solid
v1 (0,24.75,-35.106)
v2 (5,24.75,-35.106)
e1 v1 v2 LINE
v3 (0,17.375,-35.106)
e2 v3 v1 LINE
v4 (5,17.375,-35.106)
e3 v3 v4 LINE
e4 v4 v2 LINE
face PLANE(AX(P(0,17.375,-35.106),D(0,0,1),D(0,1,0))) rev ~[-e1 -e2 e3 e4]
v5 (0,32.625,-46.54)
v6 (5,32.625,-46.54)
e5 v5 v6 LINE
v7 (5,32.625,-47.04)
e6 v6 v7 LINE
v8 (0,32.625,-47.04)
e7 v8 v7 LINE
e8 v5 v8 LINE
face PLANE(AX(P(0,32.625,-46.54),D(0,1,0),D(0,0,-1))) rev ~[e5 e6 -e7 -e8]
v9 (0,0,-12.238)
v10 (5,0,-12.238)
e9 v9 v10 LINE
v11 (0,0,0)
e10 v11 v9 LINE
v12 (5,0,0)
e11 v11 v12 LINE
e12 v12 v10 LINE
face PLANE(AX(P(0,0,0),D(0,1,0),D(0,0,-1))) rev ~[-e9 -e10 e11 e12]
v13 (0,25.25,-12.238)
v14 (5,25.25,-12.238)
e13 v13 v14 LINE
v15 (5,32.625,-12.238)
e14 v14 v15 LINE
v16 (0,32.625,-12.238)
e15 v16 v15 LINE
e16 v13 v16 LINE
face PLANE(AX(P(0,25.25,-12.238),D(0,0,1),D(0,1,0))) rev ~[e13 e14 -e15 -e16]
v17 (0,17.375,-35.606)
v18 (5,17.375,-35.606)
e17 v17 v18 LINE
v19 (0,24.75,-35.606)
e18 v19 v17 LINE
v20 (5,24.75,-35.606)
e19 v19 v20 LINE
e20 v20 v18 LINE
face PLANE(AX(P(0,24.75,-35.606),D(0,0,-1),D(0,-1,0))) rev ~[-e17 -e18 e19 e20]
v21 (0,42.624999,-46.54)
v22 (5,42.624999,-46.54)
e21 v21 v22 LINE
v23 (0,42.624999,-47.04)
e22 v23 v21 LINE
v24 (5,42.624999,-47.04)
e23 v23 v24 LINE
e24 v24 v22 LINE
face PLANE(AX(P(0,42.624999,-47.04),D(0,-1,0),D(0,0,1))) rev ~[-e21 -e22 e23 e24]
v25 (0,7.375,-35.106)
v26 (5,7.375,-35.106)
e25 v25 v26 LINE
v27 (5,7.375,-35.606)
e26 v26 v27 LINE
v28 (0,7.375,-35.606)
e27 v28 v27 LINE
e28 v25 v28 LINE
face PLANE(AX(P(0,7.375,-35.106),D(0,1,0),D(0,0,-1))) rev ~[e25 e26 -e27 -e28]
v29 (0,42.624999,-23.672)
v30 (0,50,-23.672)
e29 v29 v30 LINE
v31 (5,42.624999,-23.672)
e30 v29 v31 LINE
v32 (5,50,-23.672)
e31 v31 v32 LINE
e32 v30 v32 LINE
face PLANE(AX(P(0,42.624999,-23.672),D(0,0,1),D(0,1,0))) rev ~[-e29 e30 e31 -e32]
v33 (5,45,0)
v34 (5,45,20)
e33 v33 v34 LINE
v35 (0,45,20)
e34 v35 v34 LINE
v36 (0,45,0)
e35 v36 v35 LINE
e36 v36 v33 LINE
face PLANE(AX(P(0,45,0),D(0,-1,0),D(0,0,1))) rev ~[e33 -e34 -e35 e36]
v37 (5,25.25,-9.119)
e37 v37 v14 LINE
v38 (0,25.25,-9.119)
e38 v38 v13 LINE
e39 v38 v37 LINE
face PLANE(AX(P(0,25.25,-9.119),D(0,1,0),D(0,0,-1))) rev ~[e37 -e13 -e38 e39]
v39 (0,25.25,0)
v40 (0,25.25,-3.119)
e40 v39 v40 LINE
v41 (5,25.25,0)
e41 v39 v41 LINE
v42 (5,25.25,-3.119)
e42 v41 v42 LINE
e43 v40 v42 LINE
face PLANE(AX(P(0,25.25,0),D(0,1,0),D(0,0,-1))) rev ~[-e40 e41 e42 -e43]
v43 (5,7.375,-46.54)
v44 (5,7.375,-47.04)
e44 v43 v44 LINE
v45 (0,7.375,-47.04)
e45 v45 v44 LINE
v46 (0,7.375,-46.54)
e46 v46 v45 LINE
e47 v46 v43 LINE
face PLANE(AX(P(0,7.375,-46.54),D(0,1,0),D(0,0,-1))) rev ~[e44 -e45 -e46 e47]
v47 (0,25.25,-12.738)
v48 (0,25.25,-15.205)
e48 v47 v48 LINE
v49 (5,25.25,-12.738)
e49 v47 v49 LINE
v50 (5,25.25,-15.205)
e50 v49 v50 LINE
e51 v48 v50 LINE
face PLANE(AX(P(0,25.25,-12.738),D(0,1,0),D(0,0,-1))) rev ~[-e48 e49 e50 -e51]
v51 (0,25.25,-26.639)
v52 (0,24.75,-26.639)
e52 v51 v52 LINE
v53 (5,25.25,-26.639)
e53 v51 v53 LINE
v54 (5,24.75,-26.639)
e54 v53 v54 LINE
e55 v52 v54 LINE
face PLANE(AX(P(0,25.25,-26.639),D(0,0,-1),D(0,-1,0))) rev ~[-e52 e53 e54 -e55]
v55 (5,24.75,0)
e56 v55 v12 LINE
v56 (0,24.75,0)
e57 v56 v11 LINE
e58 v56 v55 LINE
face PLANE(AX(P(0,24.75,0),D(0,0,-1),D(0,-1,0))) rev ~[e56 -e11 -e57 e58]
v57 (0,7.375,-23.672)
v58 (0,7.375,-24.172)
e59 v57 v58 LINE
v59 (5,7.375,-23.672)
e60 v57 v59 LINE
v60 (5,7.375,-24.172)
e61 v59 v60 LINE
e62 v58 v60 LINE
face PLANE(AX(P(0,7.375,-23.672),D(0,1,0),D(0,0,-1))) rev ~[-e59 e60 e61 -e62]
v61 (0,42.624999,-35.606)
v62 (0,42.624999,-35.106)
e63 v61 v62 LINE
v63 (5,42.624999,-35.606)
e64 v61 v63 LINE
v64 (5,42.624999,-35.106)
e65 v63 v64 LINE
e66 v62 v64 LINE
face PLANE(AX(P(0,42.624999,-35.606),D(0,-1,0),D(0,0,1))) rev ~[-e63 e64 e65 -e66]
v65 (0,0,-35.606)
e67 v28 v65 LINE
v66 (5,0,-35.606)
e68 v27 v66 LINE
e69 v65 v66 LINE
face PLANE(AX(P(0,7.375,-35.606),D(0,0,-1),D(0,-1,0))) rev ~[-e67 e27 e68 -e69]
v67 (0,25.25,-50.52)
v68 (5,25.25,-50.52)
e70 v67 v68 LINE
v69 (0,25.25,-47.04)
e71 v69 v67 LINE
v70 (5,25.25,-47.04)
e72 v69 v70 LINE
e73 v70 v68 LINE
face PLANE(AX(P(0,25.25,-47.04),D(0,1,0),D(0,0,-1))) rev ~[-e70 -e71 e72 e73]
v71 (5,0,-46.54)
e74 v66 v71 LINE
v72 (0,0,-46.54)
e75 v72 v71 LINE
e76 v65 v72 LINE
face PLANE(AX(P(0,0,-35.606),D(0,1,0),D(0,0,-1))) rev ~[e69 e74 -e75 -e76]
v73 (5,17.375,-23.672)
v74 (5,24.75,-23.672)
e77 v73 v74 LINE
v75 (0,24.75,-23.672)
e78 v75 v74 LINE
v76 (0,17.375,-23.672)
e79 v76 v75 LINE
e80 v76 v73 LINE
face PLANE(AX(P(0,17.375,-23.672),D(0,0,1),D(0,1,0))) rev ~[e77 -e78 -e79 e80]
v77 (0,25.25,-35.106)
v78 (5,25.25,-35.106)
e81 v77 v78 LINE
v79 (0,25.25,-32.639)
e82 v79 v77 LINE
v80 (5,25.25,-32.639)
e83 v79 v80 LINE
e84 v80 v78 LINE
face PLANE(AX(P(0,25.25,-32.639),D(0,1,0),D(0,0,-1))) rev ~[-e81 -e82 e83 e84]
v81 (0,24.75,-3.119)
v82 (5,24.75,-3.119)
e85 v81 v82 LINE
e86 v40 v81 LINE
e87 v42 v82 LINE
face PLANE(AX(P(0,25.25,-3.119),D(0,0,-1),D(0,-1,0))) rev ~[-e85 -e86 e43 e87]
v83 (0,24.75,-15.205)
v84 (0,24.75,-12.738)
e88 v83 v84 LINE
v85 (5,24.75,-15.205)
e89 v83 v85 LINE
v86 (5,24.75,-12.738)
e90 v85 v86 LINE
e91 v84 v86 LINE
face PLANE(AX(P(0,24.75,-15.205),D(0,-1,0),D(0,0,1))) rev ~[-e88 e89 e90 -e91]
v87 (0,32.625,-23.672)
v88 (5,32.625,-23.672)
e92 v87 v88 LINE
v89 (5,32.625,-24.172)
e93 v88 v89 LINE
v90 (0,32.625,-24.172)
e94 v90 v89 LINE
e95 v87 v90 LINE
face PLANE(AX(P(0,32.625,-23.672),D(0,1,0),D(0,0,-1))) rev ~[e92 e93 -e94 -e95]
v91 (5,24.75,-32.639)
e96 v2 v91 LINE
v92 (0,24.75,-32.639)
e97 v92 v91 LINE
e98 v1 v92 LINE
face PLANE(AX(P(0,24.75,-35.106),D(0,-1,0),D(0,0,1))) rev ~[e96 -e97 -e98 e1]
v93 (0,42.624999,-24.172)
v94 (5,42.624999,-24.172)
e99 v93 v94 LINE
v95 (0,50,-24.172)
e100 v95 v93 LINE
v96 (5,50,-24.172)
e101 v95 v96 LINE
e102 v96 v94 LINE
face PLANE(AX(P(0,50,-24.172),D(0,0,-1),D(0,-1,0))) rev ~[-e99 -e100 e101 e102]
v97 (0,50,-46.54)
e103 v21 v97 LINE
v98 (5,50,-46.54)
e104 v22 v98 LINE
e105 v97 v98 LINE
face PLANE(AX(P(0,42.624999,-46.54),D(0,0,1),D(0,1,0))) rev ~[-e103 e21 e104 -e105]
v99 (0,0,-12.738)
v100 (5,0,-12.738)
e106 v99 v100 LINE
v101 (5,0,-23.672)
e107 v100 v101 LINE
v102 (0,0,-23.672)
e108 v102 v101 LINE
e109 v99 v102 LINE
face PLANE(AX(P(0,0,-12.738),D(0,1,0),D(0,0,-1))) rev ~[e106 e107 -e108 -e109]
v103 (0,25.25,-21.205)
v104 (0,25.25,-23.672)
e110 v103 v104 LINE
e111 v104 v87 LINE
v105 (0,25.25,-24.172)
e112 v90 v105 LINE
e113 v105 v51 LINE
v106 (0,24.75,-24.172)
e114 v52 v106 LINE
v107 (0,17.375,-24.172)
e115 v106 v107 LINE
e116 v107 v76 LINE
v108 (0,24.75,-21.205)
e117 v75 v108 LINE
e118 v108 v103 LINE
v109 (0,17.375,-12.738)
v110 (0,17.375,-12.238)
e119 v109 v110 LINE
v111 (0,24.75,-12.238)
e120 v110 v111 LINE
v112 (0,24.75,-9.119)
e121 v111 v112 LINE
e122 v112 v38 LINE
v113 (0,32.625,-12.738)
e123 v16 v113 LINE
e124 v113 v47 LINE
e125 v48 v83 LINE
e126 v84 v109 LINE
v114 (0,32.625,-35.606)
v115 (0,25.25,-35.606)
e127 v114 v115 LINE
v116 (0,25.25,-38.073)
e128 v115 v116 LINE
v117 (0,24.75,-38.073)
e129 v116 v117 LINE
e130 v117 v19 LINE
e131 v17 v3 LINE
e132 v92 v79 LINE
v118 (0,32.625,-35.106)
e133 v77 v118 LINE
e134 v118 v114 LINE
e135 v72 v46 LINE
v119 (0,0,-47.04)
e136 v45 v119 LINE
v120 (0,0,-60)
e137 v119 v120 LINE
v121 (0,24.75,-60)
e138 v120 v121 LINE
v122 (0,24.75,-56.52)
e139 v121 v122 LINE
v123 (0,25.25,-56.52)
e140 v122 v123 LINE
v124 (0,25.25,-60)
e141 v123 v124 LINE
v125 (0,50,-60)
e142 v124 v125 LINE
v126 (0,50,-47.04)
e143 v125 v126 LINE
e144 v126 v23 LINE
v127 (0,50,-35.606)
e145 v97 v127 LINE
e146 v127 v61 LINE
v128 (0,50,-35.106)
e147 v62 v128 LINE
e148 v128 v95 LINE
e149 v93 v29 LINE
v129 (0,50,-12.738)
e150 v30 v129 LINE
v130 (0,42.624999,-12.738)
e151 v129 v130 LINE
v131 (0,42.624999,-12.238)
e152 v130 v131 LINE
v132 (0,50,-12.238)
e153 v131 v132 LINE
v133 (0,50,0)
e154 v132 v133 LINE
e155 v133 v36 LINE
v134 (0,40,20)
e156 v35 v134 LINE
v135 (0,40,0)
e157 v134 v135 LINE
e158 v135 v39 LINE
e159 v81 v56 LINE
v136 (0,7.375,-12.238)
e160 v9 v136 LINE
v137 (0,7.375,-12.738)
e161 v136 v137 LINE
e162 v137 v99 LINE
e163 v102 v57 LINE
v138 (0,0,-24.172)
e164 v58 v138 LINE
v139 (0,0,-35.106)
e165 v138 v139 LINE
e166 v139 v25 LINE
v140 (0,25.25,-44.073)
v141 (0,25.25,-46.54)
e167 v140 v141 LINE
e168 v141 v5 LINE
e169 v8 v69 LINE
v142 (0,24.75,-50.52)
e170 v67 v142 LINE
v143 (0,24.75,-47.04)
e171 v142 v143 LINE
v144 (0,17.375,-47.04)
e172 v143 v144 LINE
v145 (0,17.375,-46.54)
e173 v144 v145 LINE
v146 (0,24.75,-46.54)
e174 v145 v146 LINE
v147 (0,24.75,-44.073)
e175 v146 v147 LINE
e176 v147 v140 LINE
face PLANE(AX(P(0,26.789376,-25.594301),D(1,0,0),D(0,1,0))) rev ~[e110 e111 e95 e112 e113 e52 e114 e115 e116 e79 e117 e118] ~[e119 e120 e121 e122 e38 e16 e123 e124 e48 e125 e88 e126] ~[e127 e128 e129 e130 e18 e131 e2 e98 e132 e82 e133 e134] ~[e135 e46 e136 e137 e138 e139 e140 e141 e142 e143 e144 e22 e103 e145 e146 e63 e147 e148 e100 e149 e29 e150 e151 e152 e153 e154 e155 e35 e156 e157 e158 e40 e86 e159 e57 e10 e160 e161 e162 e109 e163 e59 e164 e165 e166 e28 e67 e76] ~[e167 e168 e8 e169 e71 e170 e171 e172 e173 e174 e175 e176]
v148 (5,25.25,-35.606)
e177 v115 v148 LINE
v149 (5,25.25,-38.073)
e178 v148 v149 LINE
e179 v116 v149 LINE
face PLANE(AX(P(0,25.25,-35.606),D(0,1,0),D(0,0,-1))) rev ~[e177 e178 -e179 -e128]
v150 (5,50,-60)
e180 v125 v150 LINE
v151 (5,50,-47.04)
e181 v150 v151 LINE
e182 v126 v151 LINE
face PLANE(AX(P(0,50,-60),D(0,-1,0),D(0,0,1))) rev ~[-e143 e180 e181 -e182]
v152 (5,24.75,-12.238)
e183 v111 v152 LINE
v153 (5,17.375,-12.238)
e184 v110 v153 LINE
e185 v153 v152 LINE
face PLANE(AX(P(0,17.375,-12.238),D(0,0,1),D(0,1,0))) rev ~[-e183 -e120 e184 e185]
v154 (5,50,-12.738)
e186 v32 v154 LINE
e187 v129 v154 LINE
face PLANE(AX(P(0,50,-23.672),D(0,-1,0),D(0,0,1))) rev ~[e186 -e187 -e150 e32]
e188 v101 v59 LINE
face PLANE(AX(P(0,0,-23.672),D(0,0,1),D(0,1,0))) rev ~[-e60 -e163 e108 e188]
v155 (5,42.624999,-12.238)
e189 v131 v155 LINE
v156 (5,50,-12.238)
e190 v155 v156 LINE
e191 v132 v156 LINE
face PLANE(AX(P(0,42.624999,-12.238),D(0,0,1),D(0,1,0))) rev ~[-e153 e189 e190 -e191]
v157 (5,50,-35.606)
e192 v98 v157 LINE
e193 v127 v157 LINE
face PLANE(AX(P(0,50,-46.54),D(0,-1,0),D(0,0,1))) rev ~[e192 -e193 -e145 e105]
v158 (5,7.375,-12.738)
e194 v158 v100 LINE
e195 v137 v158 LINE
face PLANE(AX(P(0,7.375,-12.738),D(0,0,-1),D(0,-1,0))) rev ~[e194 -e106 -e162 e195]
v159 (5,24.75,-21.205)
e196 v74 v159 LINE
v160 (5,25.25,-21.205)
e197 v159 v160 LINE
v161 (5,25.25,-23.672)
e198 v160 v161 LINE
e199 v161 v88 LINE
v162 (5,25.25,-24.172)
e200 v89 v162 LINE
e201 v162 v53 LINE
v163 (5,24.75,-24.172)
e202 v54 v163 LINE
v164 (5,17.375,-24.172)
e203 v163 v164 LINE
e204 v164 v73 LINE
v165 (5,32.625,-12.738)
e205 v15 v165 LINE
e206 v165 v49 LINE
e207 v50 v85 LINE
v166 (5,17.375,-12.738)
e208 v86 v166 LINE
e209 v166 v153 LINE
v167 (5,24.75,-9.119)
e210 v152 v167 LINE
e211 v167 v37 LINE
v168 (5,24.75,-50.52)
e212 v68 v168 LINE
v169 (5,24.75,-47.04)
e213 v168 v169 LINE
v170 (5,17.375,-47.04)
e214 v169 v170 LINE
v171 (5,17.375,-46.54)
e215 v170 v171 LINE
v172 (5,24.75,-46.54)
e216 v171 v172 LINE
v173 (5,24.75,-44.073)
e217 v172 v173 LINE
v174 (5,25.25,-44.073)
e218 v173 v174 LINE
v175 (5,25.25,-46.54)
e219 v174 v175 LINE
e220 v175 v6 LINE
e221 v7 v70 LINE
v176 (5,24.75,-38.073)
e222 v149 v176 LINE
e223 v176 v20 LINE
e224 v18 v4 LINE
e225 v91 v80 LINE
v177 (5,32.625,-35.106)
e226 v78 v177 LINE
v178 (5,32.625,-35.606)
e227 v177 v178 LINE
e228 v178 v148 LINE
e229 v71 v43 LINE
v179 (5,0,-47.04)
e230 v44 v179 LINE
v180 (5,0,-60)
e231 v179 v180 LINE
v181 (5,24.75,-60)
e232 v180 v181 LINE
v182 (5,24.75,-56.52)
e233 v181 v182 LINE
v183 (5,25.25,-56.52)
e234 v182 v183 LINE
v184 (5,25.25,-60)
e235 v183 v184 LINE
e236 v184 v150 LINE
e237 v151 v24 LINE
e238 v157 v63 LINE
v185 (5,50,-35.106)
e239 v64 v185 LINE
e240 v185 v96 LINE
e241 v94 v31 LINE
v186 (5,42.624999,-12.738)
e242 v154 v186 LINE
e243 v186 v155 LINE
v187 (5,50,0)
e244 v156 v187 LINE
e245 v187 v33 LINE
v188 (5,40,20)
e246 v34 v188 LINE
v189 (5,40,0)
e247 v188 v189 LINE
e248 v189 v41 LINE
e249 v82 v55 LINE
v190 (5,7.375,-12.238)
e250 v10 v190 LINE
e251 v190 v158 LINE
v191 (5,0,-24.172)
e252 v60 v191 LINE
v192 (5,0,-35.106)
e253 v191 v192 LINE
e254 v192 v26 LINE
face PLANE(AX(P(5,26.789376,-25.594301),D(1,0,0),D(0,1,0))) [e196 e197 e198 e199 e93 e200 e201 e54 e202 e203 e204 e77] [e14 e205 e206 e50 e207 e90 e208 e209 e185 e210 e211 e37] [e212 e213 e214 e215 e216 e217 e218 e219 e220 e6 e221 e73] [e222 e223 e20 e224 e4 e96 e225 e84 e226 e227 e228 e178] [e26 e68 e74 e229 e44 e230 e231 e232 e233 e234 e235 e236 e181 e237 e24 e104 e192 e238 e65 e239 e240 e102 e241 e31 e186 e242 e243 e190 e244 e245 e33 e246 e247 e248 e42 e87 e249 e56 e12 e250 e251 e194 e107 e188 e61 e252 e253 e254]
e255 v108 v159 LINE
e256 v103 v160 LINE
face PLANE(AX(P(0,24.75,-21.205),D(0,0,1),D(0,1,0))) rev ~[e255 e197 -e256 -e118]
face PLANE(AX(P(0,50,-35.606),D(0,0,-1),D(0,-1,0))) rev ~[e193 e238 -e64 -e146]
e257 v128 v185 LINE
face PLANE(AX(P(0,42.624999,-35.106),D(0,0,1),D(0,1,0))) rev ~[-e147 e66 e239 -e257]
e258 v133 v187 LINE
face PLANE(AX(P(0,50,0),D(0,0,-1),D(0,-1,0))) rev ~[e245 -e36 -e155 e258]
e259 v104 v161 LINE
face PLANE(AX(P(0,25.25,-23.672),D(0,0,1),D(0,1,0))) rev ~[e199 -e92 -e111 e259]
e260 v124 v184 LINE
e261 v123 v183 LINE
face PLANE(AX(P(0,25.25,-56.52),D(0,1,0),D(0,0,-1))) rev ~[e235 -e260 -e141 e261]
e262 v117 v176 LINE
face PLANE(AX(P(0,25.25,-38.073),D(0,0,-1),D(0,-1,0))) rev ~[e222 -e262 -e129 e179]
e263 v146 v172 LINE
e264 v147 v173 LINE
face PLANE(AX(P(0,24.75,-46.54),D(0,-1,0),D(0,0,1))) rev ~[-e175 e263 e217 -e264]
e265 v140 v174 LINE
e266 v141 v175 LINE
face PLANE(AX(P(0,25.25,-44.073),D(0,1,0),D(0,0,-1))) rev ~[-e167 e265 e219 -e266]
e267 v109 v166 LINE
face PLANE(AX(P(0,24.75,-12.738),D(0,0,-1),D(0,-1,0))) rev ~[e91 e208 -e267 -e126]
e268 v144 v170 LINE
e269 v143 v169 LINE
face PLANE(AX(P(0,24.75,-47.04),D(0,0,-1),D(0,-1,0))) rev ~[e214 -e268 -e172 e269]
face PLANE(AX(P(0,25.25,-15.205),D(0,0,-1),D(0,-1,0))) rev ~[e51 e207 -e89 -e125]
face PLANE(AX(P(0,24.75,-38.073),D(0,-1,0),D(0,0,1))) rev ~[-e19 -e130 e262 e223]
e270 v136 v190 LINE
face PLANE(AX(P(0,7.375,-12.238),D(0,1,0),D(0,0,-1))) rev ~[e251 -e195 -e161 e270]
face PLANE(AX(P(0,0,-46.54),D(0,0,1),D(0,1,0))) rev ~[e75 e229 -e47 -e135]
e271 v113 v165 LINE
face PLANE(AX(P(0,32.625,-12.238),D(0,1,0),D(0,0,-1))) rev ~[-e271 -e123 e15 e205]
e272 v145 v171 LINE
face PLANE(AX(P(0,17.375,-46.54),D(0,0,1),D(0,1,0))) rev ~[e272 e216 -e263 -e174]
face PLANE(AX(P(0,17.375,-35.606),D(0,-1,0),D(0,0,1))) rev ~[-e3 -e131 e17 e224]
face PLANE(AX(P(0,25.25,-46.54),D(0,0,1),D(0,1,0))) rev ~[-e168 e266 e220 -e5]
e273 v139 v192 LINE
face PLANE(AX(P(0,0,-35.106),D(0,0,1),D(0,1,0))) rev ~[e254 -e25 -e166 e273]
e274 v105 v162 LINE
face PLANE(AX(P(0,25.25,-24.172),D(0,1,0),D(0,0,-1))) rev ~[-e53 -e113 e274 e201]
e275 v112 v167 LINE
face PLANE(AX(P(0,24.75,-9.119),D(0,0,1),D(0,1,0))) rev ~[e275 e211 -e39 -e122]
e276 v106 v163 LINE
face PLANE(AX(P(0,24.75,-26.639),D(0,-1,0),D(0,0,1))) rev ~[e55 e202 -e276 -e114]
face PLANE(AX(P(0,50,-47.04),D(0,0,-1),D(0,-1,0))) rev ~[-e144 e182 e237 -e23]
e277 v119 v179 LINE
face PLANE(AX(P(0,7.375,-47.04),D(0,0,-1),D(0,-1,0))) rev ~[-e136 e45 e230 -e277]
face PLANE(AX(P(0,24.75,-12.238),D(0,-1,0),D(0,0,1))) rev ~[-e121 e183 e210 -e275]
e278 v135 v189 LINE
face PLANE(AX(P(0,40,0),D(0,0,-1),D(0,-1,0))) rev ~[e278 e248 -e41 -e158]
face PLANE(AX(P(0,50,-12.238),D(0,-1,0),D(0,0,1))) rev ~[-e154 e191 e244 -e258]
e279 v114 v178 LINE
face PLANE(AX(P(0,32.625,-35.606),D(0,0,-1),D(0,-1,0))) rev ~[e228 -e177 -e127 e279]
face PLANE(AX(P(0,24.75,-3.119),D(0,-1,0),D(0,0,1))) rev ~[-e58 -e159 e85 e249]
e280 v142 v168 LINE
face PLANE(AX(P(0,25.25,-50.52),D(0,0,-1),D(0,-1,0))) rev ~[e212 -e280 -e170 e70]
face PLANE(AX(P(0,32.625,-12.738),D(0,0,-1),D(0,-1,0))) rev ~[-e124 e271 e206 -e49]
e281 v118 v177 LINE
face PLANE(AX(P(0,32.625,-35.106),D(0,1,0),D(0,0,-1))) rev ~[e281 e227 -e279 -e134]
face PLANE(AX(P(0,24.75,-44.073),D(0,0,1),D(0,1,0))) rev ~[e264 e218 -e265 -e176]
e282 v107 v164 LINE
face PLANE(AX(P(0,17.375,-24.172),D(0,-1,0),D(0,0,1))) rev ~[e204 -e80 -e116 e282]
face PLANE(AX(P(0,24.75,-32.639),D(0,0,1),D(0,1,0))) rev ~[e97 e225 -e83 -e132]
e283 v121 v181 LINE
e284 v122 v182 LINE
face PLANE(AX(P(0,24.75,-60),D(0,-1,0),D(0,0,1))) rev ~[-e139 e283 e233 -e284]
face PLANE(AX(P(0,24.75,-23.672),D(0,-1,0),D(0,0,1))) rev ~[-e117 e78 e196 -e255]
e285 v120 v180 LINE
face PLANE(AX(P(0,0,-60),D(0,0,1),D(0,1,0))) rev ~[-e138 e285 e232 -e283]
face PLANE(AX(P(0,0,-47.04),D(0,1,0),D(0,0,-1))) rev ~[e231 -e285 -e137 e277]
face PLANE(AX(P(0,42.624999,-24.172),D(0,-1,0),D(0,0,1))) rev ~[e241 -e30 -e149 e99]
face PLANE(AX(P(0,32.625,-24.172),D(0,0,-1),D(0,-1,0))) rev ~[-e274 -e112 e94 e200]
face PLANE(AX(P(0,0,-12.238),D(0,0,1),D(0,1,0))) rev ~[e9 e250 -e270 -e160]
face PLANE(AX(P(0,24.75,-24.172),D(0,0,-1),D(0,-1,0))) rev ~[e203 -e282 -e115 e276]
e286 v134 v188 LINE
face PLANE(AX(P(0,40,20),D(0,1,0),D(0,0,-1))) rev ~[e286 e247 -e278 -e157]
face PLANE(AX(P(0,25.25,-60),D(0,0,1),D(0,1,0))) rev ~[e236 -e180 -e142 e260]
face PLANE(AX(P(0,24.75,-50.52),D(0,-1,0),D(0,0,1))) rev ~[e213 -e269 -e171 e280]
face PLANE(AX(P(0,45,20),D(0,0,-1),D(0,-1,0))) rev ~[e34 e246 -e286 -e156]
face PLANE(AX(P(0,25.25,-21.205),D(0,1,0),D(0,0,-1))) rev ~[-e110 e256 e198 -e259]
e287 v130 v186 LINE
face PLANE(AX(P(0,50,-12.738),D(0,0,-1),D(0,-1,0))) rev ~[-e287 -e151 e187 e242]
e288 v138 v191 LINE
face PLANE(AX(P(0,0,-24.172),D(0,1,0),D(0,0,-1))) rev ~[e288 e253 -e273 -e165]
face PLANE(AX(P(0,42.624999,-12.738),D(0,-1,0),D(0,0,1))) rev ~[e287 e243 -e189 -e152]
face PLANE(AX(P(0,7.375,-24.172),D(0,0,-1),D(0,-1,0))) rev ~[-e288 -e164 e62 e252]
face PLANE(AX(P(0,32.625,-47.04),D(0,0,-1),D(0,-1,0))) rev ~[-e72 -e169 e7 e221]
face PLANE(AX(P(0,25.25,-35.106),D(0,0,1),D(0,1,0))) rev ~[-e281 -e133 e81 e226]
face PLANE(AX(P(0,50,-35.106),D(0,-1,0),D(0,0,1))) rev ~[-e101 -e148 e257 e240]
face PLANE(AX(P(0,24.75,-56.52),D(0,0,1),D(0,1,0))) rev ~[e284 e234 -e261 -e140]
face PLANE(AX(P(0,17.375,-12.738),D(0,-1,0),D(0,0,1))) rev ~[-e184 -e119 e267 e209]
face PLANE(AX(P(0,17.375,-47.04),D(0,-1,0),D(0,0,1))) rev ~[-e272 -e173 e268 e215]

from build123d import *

# Parameters (mm, degrees)
F1_DEPTH = 5


# Not quite as in the source:
# - a feature names something its author has since deleted; it is built from what else it names


with BuildPart() as f1:
    # F0 (on Right) → F1 (new body)
    with BuildSketch(Plane.YZ):
        Polygon((11.5, 0), (0, 0), (0, -12.238), (7.3750000447, -12.238), (7.3750000447, -12.738), (0, -12.738), (0, -23.672), (7.3750000447, -23.672), (7.3750000447, -24.172), (0, -24.172), (0, -35.106), (7.3750000447, -35.106), (7.3750000447, -35.606), (0, -35.606), (0, -46.54), (7.3750000447, -46.54), (7.3750000447, -47.04), (0, -47.04), (0, -60), (24.75, -60), (24.75, -56.52), (25.25, -56.52), (25.25, -60), (50, -60), (50, -47.04), (42.6249988377, -47.04), (42.6249988377, -46.54), (50, -46.54), (50, -35.606), (42.6249988377, -35.606), (42.6249988377, -35.106), (50, -35.106), (50, -24.172), (42.6249988377, -24.172), (42.6249988377, -23.672), (50, -23.672), (50, -12.738), (42.6249988377, -12.738), (42.6249988377, -12.238), (50, -12.238), (50, 0), (45, 0), (45, 15), (45, 19.999999553), (40, 19.999999553), (40, 15), (40, 0), (37.625, 0), (35.125, 0), (25.25, 0), (25.25, -1.304), (25.25, -3.119), (24.75, -3.119), (24.75, 0), (14.875, 0), (12.375, 0), align=None)
        Polygon((25.25, -44.073), (25.25, -46.54), (32.625, -46.54), (32.625, -47.04), (25.25, -47.04), (25.25, -50.52), (24.75, -50.52), (24.75, -47.04), (17.375, -47.04), (17.375, -46.54), (24.75, -46.54), (24.75, -44.073), align=None, mode=Mode.SUBTRACT)
        Polygon((25.25, -32.639), (25.25, -35.106), (32.625, -35.106), (32.625, -35.606), (25.25, -35.606), (25.25, -38.073), (24.75, -38.073), (24.75, -35.606), (17.375, -35.606), (17.375, -35.106), (24.75, -35.106), (24.75, -32.639), align=None, mode=Mode.SUBTRACT)
        Polygon((25.25, -21.205), (25.25, -23.672), (32.625, -23.672), (32.625, -24.172), (25.25, -24.172), (25.25, -26.639), (24.75, -26.639), (24.75, -24.172), (17.375, -24.172), (17.375, -23.672), (24.75, -23.672), (24.75, -21.205), align=None, mode=Mode.SUBTRACT)
        Polygon((25.25, -9.119), (25.25, -12.238), (32.625, -12.238), (32.625, -12.738), (25.25, -12.738), (25.25, -15.205), (24.75, -15.205), (24.75, -12.738), (17.375, -12.738), (17.375, -12.238), (24.75, -12.238), (24.75, -9.119), align=None, mode=Mode.SUBTRACT)
    extrude(amount=F1_DEPTH)


solid = f1.part
